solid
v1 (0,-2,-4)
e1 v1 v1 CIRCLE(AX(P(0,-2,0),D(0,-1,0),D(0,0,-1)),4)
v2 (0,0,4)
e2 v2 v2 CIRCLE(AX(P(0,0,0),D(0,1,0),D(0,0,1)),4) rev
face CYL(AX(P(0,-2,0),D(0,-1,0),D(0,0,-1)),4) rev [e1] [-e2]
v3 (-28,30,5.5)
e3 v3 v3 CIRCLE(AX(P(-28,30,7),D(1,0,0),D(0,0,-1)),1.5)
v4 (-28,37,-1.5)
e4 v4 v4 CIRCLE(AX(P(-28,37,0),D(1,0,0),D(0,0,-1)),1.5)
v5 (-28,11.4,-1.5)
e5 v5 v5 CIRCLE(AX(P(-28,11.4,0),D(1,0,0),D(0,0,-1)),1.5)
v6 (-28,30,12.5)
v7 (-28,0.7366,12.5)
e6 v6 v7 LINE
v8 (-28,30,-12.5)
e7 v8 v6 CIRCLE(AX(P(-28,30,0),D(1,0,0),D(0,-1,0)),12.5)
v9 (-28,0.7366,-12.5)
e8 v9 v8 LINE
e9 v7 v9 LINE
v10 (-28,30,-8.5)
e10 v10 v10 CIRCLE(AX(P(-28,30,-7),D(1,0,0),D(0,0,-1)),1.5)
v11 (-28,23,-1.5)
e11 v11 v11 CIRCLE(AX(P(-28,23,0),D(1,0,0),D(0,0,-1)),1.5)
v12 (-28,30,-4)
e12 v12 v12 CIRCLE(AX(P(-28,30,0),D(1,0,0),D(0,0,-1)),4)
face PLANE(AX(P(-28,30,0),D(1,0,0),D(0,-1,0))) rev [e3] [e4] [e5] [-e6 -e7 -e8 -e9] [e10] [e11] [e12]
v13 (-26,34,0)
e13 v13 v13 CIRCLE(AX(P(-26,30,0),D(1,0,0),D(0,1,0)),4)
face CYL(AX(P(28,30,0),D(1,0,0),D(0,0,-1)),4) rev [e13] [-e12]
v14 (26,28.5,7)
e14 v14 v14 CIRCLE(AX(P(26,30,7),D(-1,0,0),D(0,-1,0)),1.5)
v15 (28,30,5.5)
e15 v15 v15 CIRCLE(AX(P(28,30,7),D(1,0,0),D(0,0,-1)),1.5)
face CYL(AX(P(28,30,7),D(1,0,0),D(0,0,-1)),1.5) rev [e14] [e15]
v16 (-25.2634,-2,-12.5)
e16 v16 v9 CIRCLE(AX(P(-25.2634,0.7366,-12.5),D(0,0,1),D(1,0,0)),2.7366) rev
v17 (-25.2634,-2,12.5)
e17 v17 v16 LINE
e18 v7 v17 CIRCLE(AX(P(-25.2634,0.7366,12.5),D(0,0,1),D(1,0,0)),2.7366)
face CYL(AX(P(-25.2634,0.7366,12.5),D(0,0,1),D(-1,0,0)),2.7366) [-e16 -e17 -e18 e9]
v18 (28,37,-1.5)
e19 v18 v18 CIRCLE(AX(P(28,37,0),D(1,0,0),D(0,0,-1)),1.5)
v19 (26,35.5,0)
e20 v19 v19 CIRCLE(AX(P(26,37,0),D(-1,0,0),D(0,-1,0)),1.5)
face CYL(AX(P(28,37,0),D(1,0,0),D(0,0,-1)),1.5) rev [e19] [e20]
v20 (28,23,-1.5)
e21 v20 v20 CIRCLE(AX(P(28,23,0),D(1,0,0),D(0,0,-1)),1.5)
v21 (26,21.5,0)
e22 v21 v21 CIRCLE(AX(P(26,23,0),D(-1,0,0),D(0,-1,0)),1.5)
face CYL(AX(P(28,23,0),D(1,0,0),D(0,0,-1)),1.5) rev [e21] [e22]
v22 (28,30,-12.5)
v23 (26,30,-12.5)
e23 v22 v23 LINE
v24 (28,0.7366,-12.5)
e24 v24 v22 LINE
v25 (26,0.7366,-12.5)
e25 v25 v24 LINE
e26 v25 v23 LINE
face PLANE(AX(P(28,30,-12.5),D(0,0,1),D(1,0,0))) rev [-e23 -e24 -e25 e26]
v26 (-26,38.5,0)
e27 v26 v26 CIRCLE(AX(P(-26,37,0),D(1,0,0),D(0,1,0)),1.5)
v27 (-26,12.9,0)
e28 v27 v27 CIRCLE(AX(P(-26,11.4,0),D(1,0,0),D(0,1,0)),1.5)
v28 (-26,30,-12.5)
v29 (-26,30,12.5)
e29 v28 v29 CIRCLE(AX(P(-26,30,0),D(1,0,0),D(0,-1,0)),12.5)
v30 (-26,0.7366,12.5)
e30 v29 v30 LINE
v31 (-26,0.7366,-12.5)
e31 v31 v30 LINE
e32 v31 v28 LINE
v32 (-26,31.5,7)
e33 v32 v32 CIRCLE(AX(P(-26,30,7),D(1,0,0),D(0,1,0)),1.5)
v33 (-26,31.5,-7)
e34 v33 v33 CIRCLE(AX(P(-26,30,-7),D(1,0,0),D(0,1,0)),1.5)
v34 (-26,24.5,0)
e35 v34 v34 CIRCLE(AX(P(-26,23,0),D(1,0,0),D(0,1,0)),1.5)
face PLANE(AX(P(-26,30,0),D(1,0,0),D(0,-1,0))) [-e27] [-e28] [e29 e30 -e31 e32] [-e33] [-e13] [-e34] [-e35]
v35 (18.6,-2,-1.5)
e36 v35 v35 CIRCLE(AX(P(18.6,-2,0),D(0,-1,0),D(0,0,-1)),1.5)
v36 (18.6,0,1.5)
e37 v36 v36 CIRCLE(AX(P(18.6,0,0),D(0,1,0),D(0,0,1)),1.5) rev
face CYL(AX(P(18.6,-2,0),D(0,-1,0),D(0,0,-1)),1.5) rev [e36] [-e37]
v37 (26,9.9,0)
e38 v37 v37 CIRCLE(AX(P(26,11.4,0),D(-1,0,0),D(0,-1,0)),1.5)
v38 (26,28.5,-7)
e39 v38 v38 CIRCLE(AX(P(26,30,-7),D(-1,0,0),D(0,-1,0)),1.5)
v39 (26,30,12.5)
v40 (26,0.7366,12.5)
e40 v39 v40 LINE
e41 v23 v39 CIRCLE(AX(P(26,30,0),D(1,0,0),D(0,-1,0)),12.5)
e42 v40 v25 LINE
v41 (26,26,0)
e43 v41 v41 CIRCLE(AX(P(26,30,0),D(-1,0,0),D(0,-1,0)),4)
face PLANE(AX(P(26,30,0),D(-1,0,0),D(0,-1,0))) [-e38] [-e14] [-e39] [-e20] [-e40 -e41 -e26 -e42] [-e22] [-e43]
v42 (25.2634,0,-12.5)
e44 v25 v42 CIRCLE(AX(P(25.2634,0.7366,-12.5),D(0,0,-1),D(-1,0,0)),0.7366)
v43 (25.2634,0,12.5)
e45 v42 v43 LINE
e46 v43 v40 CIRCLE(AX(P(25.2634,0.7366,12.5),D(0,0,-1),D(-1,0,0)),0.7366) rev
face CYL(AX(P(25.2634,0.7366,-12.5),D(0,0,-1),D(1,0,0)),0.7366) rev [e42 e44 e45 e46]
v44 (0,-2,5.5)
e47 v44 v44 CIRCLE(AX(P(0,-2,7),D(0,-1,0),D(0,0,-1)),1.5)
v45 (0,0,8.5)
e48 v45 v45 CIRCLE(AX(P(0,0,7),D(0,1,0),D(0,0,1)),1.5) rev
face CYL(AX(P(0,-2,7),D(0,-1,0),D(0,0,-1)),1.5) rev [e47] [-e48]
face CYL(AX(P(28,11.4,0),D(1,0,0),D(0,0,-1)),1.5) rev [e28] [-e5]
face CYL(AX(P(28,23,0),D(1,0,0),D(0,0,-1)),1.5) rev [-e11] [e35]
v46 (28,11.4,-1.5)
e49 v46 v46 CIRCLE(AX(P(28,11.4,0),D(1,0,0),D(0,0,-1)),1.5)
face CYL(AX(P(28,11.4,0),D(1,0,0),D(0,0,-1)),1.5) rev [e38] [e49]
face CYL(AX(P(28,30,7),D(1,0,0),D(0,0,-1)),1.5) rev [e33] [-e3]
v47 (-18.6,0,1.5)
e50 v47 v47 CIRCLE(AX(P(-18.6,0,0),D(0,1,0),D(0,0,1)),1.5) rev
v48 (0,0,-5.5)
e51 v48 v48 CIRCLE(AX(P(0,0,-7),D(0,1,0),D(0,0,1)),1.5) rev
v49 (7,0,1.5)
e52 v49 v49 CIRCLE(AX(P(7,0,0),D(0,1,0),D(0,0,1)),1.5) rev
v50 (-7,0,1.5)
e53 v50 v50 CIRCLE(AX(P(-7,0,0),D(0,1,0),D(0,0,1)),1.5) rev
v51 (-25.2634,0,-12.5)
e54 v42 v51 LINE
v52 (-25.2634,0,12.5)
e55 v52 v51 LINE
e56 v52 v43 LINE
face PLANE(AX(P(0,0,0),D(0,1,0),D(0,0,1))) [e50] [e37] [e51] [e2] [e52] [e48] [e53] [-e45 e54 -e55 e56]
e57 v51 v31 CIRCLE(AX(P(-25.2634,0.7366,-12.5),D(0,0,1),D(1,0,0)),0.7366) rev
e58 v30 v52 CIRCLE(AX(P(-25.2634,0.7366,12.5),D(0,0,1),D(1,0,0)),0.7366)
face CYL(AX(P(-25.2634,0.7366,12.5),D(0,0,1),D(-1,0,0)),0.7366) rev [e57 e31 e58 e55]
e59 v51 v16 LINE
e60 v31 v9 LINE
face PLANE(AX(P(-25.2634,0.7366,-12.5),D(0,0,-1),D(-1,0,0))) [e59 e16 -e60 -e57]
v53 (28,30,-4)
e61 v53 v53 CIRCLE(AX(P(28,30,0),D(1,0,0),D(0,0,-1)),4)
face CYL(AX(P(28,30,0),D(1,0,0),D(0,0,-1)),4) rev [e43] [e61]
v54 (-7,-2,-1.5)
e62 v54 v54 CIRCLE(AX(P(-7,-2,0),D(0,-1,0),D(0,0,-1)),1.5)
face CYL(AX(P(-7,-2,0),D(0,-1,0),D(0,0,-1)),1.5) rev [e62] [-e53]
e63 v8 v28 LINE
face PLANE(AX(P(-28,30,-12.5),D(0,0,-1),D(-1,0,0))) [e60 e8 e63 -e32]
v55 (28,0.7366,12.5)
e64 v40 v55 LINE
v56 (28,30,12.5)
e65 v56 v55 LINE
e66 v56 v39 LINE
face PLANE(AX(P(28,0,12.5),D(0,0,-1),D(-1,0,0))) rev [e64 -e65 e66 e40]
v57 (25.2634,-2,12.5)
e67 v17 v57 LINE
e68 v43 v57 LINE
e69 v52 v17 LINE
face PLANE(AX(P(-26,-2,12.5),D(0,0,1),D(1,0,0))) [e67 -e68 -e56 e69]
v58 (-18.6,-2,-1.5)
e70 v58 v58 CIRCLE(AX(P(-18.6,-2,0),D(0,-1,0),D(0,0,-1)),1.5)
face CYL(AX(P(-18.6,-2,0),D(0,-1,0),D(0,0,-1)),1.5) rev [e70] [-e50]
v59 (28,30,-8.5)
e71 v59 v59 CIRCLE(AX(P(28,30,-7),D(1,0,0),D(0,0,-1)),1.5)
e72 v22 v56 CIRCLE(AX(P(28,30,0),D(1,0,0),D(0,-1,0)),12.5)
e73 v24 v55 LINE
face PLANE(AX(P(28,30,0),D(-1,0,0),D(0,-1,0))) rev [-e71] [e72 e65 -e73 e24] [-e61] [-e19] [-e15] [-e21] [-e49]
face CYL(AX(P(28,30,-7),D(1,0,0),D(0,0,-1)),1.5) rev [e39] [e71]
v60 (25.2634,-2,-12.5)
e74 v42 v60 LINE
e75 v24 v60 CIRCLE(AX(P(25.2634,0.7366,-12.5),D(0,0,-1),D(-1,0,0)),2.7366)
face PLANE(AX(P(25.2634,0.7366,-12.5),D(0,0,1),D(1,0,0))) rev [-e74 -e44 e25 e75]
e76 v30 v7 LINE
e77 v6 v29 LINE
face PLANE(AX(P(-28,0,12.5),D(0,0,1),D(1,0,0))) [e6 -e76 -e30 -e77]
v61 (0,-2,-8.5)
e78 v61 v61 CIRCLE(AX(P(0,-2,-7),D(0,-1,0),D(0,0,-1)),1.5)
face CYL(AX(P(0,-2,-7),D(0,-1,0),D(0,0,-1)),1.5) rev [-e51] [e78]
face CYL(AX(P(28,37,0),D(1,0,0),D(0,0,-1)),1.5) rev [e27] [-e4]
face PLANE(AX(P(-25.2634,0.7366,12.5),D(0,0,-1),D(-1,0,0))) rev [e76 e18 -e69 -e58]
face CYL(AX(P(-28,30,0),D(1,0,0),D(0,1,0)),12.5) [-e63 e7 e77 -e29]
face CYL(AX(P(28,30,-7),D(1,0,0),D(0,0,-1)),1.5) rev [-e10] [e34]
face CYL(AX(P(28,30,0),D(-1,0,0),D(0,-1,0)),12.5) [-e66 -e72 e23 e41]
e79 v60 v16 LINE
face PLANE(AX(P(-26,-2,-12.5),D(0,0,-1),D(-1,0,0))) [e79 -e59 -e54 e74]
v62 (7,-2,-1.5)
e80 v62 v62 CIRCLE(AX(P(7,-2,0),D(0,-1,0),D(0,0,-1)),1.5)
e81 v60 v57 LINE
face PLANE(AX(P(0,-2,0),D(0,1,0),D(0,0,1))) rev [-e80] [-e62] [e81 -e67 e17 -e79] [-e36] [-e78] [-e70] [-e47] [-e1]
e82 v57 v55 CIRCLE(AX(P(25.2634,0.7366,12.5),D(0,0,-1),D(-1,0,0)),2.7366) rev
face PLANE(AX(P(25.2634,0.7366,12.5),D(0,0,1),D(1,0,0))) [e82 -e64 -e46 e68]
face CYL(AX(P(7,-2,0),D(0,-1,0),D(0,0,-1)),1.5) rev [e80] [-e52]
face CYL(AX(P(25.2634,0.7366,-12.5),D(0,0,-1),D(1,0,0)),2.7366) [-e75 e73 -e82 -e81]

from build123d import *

# Parameters (mm, degrees)
SKETCH_1_W                       = 52
SKETCH_1_H                       = 25
SM_BASE_FLANGE_1_DEPTH           = 2
SM_EDGE_FLANGE_1_STRIP_W         = 9.4732
SM_EDGE_FLANGE_1_STRIP_H         = 2
SM_EDGE_FLANGE_1_STRIP_CUT_DEPTH = 25
SM_EDGE_FLANGE_1_DEPTH           = 25
SM_START                         = 2
SM_EDGE_FLANGE_1_FLAT_DEPTH      = 2
HOLE_WIZARD_3_0_3_1_D            = 3
HOLE_WIZARD_8_0_8_1_D            = 8
HOLE_WIZARD_3_0_3_2_D            = 3
HOLE_WIZARD_8_0_8_2_D            = 8


# Sheet-metal steps are written as plain solids
with BuildPart() as part:
    # Sketch 1 → 基体-法兰1 (new body)
    with BuildSketch(Plane(origin=(0, 0, 0), x_dir=(1, 0, 0), z_dir=(0, 1, 0))):
        Rectangle(SKETCH_1_W, SKETCH_1_H)
    extrude(amount=-SM_BASE_FLANGE_1_DEPTH)

    # 边线-法兰1 strip (across the edge) → 边线-法兰1 strip cut (cut)
    with BuildSketch(Plane(origin=(26, 0, 12.5), x_dir=(-1, 0, 0), z_dir=(0, 0, -1))):
        with Locations((-4, -1)):
            Rectangle(SM_EDGE_FLANGE_1_STRIP_W, SM_EDGE_FLANGE_1_STRIP_H)
    sm_edge_flange_1_strip_cut = extrude(amount=SM_EDGE_FLANGE_1_STRIP_CUT_DEPTH, mode=Mode.SUBTRACT)

    # 边线-法兰1 bend section (across the edge) → 边线-法兰1 (add)
    with BuildSketch(Plane(origin=(26, 0, 12.5), x_dir=(-1, 0, 0), z_dir=(0, 0, -1))):
        with BuildLine():
            Line((-2, 0.7366), (0, 0.7366))
            ThreePointArc((0, 0.7366), (0.215745145, 0.215745145), (0.7366, 0))
            Line((0.7366, 0), (0.7366, -2))
            ThreePointArc((0.7366, -2), (-1.198468417, -1.198468417), (-2, 0.7366))
        make_face()
    sm_edge_flange_1 = extrude(amount=SM_EDGE_FLANGE_1_DEPTH)

    # 边线-法兰1 profile (on flange) → 边线-法兰1 flat (add)
    with BuildSketch(Plane(origin=(26, 0, 0), x_dir=(0, 0, -1), z_dir=(1, 0, 0)).offset(SM_START)):
        with BuildLine():
            Line((-12.5, 30), (-12.5, 0.7366))
            Line((-12.5, 0.7366), (12.5, 0.7366))
            Line((12.5, 0.7366), (12.5, 30))
            ThreePointArc((12.5, 30), (0, 42.5), (-12.5, 30))
        make_face()
    sm_edge_flange_1_flat = extrude(amount=-SM_EDGE_FLANGE_1_FLAT_DEPTH)

    # 镜向1: 边线-法兰1 strip cut, 边线-法兰1, 边线-法兰1 flat across plane
    add(sm_edge_flange_1_strip_cut.mirror(Plane(origin=(0, 0, 0), x_dir=(0, 0, 1), z_dir=(1, 0, 0))), mode=Mode.SUBTRACT)
    add(sm_edge_flange_1.mirror(Plane(origin=(0, 0, 0), x_dir=(0, 0, 1), z_dir=(1, 0, 0))))
    add(sm_edge_flange_1_flat.mirror(Plane(origin=(0, 0, 0), x_dir=(0, 0, 1), z_dir=(1, 0, 0))))

    # Ø3.0 (3) 直径孔1 (through all)
    with Locations(Plane(origin=(0, -2, 0), x_dir=(-1, 0, 0), z_dir=(0, -1, 0))):
        with Locations((0, -7), (0, 7), (-7, 0), (7, 0), (18.6, 0), (-18.6, 0)):
            Hole(HOLE_WIZARD_3_0_3_1_D / 2)

    # Ø8.0 (8) 直径孔1 (through all)
    with Locations(Plane(origin=(0, -2, 0), x_dir=(-1, 0, 0), z_dir=(0, -1, 0))):
        with Locations((0, 0)):
            Hole(HOLE_WIZARD_8_0_8_1_D / 2)

    # Ø3.0 (3) 直径孔2 (through all)
    with Locations(Plane(origin=(28, 0, 0), x_dir=(0, 0, -1), z_dir=(1, 0, 0))):
        with Locations((0, 11.4), (0, 37), (7, 30), (-7, 30), (0, 23)):
            Hole(HOLE_WIZARD_3_0_3_2_D / 2)

    # Ø8.0 (8) 直径孔2 (through all)
    with Locations(Plane(origin=(28, 0, 0), x_dir=(0, 0, -1), z_dir=(1, 0, 0))):
        with Locations((0, 30)):
            Hole(HOLE_WIZARD_8_0_8_2_D / 2)


solid = part.part
